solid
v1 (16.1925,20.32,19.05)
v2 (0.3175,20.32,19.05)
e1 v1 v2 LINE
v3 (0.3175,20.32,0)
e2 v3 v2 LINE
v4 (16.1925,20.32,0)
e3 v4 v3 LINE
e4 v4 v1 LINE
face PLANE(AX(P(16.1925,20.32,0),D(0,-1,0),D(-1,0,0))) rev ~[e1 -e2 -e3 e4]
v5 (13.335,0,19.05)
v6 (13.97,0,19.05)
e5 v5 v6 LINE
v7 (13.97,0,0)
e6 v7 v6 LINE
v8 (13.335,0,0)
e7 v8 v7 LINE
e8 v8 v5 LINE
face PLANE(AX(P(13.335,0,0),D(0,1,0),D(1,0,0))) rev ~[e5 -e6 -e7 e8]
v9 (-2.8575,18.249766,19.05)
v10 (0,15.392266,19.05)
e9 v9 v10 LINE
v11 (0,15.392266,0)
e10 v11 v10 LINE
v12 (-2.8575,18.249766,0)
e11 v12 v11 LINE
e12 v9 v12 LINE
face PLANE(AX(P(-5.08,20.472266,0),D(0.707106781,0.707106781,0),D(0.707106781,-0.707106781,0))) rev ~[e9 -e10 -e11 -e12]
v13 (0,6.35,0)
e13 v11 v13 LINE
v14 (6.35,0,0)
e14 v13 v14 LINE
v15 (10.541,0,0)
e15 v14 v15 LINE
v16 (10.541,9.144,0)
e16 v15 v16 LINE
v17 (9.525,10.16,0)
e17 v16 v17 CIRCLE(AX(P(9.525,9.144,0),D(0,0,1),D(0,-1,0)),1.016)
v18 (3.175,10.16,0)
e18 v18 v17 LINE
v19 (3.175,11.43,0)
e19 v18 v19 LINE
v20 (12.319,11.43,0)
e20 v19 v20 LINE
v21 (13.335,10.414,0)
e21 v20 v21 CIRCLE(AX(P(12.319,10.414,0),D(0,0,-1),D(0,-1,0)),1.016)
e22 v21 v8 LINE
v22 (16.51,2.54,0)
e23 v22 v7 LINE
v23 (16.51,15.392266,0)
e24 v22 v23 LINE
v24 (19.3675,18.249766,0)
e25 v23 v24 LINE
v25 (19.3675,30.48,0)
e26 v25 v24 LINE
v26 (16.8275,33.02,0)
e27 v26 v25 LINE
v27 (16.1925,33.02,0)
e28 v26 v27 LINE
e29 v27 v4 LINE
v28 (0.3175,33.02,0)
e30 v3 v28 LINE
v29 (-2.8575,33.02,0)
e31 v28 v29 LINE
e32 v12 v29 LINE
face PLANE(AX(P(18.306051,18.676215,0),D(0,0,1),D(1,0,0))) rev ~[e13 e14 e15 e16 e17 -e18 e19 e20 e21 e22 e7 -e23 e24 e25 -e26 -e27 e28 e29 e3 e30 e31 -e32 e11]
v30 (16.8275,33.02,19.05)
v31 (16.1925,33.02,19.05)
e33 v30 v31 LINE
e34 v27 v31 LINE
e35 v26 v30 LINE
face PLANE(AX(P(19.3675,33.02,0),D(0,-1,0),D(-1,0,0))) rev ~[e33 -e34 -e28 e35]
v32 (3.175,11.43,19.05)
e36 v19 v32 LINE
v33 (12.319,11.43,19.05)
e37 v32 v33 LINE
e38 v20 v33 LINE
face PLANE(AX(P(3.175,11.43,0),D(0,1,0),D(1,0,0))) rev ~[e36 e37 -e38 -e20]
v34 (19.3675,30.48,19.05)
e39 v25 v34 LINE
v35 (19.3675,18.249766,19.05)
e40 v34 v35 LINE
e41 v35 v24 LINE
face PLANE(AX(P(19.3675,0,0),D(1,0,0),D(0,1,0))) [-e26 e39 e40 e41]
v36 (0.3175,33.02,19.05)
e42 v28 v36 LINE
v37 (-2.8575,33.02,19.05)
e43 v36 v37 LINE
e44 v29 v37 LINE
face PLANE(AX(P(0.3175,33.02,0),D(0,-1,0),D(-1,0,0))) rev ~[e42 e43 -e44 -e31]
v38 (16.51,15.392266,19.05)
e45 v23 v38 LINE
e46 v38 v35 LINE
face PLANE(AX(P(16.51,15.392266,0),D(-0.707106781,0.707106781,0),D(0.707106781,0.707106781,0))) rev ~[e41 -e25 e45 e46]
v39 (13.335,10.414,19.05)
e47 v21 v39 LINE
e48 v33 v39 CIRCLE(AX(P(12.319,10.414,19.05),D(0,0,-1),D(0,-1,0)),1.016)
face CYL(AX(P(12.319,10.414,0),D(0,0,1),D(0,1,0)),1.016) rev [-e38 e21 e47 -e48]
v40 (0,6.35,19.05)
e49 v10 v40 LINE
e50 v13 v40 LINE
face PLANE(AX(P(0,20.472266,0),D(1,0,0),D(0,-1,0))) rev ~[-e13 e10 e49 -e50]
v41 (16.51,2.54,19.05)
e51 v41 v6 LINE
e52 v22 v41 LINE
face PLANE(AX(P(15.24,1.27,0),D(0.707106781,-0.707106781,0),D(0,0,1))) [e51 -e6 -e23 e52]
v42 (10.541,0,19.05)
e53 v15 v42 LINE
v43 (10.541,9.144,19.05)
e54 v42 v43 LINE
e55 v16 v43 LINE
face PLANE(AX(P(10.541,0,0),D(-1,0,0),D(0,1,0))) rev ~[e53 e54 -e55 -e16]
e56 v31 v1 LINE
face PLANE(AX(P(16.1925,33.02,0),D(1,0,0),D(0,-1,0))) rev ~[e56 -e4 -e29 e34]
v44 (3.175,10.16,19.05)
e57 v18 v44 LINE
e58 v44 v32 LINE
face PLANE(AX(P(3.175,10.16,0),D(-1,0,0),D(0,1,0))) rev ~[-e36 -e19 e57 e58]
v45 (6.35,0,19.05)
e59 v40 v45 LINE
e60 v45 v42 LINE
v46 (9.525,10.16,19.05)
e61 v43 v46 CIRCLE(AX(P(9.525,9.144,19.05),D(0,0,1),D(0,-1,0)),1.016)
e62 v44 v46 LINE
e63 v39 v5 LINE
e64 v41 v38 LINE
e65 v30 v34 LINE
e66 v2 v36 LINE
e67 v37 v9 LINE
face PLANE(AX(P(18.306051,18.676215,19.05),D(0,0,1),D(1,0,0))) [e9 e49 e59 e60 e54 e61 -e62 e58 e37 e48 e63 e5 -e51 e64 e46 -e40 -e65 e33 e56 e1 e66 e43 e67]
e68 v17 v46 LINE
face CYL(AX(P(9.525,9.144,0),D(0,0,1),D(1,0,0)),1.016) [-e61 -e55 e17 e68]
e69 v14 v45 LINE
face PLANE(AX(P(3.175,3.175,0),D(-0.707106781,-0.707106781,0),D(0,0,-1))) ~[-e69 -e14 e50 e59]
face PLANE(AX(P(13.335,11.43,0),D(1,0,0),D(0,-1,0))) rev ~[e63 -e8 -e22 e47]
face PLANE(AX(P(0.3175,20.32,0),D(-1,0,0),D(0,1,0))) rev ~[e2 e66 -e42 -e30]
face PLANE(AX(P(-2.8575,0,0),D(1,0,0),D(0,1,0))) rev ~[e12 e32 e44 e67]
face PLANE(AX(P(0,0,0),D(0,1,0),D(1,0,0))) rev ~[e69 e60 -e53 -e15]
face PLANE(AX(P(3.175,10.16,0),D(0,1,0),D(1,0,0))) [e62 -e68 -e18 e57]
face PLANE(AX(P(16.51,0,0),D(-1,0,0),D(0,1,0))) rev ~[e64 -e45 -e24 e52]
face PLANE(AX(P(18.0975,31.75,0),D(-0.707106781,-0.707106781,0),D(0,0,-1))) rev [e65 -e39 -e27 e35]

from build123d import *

# Parameters (mm, degrees)
F0_W        = 7.366
F0_H        = 10.16
F1_DEPTH    = 19.05
F2_T4_DEPTH = 19.05
F2_T9_DEPTH = 19.05
F3_SIZE     = 2.54
F4_SIZE     = 6.35
F5_R        = 1.016


# Not quite as in the source:
# - a fillet or chamfer that OpenCascade refuses, or shapes differently, is made with other operations: its cross-section is extruded or revolved along the edge and cut away or added


with BuildPart() as f1:
    # F0 (on Top) → F1 (new body)
    with BuildSketch(Plane.XY):
        Polygon((0, 20.4722661398), (0, 0), (3.175, 0), (3.175, 10.16), (3.175, 11.43), (8.255, 11.43), (13.335, 11.43), (13.335, 0), (16.51, 0), (16.51, 20.4722661398), (19.3675, 20.4722661398), (19.3675, 33.02), (16.1925, 33.02), (16.1925, 20.32), (8.255, 20.32), (0.3175, 20.32), (0.3175, 33.02), (-2.8575, 33.02), (-2.8575, 20.4722661398), align=None)
        with Locations((6.858, 5.08)):
            Rectangle(F0_W, F0_H)
    extrude(amount=F1_DEPTH)

    # F2: chamfer of 5.08 on 2 edges, made by hand


with BuildPart() as f2_tool2:
    # F2_s3 → F2_t4 (new body)
    with BuildSketch(Plane.XY):
        Polygon((-5.08, 20.4722661398), (0, 15.3922661398), (0, 20.4722661398), align=None)
    extrude(amount=F2_T4_DEPTH)

    split(bisect_by=Plane.YZ.offset(-2.8575), keep=Keep.TOP)


with BuildPart() as f1_1:
    add(f1.part)

    # F2_t1: union F2_tool2
    add(f2_tool2.part)


with BuildPart() as f2_tool7:
    # F2_s8 → F2_t9 (new body)
    with BuildSketch(Plane.XY):
        Polygon((16.51, 15.3922661398), (21.59, 20.4722661398), (16.51, 20.4722661398), align=None)
    extrude(amount=F2_T9_DEPTH)

    split(bisect_by=Plane.YZ.offset(19.3675), keep=Keep.BOTTOM)


with BuildPart() as f1_2:
    add(f1_1.part)

    # F2_t6: union F2_tool7
    add(f2_tool7.part)

    # F3
    f3_edges = [f1_2.edges().sort_by_distance(p)[0] for p in [
        (16.51, 0, 9.525),
        (19.3675, 33.02, 9.525),
    ]]
    chamfer(f3_edges, length=F3_SIZE)

    # F4
    f4_edges = [f1_2.edges().sort_by_distance(p)[0] for p in [
        (0, 0, 9.525),
    ]]
    chamfer(f4_edges, length=F4_SIZE)

    # F5
    f5_edges = [f1_2.edges().sort_by_distance(p)[0] for p in [
        (13.335, 11.43, 9.525),
        (10.541, 10.16, 9.525),
    ]]
    fillet(f5_edges, radius=F5_R)


solid = f1_2.part
